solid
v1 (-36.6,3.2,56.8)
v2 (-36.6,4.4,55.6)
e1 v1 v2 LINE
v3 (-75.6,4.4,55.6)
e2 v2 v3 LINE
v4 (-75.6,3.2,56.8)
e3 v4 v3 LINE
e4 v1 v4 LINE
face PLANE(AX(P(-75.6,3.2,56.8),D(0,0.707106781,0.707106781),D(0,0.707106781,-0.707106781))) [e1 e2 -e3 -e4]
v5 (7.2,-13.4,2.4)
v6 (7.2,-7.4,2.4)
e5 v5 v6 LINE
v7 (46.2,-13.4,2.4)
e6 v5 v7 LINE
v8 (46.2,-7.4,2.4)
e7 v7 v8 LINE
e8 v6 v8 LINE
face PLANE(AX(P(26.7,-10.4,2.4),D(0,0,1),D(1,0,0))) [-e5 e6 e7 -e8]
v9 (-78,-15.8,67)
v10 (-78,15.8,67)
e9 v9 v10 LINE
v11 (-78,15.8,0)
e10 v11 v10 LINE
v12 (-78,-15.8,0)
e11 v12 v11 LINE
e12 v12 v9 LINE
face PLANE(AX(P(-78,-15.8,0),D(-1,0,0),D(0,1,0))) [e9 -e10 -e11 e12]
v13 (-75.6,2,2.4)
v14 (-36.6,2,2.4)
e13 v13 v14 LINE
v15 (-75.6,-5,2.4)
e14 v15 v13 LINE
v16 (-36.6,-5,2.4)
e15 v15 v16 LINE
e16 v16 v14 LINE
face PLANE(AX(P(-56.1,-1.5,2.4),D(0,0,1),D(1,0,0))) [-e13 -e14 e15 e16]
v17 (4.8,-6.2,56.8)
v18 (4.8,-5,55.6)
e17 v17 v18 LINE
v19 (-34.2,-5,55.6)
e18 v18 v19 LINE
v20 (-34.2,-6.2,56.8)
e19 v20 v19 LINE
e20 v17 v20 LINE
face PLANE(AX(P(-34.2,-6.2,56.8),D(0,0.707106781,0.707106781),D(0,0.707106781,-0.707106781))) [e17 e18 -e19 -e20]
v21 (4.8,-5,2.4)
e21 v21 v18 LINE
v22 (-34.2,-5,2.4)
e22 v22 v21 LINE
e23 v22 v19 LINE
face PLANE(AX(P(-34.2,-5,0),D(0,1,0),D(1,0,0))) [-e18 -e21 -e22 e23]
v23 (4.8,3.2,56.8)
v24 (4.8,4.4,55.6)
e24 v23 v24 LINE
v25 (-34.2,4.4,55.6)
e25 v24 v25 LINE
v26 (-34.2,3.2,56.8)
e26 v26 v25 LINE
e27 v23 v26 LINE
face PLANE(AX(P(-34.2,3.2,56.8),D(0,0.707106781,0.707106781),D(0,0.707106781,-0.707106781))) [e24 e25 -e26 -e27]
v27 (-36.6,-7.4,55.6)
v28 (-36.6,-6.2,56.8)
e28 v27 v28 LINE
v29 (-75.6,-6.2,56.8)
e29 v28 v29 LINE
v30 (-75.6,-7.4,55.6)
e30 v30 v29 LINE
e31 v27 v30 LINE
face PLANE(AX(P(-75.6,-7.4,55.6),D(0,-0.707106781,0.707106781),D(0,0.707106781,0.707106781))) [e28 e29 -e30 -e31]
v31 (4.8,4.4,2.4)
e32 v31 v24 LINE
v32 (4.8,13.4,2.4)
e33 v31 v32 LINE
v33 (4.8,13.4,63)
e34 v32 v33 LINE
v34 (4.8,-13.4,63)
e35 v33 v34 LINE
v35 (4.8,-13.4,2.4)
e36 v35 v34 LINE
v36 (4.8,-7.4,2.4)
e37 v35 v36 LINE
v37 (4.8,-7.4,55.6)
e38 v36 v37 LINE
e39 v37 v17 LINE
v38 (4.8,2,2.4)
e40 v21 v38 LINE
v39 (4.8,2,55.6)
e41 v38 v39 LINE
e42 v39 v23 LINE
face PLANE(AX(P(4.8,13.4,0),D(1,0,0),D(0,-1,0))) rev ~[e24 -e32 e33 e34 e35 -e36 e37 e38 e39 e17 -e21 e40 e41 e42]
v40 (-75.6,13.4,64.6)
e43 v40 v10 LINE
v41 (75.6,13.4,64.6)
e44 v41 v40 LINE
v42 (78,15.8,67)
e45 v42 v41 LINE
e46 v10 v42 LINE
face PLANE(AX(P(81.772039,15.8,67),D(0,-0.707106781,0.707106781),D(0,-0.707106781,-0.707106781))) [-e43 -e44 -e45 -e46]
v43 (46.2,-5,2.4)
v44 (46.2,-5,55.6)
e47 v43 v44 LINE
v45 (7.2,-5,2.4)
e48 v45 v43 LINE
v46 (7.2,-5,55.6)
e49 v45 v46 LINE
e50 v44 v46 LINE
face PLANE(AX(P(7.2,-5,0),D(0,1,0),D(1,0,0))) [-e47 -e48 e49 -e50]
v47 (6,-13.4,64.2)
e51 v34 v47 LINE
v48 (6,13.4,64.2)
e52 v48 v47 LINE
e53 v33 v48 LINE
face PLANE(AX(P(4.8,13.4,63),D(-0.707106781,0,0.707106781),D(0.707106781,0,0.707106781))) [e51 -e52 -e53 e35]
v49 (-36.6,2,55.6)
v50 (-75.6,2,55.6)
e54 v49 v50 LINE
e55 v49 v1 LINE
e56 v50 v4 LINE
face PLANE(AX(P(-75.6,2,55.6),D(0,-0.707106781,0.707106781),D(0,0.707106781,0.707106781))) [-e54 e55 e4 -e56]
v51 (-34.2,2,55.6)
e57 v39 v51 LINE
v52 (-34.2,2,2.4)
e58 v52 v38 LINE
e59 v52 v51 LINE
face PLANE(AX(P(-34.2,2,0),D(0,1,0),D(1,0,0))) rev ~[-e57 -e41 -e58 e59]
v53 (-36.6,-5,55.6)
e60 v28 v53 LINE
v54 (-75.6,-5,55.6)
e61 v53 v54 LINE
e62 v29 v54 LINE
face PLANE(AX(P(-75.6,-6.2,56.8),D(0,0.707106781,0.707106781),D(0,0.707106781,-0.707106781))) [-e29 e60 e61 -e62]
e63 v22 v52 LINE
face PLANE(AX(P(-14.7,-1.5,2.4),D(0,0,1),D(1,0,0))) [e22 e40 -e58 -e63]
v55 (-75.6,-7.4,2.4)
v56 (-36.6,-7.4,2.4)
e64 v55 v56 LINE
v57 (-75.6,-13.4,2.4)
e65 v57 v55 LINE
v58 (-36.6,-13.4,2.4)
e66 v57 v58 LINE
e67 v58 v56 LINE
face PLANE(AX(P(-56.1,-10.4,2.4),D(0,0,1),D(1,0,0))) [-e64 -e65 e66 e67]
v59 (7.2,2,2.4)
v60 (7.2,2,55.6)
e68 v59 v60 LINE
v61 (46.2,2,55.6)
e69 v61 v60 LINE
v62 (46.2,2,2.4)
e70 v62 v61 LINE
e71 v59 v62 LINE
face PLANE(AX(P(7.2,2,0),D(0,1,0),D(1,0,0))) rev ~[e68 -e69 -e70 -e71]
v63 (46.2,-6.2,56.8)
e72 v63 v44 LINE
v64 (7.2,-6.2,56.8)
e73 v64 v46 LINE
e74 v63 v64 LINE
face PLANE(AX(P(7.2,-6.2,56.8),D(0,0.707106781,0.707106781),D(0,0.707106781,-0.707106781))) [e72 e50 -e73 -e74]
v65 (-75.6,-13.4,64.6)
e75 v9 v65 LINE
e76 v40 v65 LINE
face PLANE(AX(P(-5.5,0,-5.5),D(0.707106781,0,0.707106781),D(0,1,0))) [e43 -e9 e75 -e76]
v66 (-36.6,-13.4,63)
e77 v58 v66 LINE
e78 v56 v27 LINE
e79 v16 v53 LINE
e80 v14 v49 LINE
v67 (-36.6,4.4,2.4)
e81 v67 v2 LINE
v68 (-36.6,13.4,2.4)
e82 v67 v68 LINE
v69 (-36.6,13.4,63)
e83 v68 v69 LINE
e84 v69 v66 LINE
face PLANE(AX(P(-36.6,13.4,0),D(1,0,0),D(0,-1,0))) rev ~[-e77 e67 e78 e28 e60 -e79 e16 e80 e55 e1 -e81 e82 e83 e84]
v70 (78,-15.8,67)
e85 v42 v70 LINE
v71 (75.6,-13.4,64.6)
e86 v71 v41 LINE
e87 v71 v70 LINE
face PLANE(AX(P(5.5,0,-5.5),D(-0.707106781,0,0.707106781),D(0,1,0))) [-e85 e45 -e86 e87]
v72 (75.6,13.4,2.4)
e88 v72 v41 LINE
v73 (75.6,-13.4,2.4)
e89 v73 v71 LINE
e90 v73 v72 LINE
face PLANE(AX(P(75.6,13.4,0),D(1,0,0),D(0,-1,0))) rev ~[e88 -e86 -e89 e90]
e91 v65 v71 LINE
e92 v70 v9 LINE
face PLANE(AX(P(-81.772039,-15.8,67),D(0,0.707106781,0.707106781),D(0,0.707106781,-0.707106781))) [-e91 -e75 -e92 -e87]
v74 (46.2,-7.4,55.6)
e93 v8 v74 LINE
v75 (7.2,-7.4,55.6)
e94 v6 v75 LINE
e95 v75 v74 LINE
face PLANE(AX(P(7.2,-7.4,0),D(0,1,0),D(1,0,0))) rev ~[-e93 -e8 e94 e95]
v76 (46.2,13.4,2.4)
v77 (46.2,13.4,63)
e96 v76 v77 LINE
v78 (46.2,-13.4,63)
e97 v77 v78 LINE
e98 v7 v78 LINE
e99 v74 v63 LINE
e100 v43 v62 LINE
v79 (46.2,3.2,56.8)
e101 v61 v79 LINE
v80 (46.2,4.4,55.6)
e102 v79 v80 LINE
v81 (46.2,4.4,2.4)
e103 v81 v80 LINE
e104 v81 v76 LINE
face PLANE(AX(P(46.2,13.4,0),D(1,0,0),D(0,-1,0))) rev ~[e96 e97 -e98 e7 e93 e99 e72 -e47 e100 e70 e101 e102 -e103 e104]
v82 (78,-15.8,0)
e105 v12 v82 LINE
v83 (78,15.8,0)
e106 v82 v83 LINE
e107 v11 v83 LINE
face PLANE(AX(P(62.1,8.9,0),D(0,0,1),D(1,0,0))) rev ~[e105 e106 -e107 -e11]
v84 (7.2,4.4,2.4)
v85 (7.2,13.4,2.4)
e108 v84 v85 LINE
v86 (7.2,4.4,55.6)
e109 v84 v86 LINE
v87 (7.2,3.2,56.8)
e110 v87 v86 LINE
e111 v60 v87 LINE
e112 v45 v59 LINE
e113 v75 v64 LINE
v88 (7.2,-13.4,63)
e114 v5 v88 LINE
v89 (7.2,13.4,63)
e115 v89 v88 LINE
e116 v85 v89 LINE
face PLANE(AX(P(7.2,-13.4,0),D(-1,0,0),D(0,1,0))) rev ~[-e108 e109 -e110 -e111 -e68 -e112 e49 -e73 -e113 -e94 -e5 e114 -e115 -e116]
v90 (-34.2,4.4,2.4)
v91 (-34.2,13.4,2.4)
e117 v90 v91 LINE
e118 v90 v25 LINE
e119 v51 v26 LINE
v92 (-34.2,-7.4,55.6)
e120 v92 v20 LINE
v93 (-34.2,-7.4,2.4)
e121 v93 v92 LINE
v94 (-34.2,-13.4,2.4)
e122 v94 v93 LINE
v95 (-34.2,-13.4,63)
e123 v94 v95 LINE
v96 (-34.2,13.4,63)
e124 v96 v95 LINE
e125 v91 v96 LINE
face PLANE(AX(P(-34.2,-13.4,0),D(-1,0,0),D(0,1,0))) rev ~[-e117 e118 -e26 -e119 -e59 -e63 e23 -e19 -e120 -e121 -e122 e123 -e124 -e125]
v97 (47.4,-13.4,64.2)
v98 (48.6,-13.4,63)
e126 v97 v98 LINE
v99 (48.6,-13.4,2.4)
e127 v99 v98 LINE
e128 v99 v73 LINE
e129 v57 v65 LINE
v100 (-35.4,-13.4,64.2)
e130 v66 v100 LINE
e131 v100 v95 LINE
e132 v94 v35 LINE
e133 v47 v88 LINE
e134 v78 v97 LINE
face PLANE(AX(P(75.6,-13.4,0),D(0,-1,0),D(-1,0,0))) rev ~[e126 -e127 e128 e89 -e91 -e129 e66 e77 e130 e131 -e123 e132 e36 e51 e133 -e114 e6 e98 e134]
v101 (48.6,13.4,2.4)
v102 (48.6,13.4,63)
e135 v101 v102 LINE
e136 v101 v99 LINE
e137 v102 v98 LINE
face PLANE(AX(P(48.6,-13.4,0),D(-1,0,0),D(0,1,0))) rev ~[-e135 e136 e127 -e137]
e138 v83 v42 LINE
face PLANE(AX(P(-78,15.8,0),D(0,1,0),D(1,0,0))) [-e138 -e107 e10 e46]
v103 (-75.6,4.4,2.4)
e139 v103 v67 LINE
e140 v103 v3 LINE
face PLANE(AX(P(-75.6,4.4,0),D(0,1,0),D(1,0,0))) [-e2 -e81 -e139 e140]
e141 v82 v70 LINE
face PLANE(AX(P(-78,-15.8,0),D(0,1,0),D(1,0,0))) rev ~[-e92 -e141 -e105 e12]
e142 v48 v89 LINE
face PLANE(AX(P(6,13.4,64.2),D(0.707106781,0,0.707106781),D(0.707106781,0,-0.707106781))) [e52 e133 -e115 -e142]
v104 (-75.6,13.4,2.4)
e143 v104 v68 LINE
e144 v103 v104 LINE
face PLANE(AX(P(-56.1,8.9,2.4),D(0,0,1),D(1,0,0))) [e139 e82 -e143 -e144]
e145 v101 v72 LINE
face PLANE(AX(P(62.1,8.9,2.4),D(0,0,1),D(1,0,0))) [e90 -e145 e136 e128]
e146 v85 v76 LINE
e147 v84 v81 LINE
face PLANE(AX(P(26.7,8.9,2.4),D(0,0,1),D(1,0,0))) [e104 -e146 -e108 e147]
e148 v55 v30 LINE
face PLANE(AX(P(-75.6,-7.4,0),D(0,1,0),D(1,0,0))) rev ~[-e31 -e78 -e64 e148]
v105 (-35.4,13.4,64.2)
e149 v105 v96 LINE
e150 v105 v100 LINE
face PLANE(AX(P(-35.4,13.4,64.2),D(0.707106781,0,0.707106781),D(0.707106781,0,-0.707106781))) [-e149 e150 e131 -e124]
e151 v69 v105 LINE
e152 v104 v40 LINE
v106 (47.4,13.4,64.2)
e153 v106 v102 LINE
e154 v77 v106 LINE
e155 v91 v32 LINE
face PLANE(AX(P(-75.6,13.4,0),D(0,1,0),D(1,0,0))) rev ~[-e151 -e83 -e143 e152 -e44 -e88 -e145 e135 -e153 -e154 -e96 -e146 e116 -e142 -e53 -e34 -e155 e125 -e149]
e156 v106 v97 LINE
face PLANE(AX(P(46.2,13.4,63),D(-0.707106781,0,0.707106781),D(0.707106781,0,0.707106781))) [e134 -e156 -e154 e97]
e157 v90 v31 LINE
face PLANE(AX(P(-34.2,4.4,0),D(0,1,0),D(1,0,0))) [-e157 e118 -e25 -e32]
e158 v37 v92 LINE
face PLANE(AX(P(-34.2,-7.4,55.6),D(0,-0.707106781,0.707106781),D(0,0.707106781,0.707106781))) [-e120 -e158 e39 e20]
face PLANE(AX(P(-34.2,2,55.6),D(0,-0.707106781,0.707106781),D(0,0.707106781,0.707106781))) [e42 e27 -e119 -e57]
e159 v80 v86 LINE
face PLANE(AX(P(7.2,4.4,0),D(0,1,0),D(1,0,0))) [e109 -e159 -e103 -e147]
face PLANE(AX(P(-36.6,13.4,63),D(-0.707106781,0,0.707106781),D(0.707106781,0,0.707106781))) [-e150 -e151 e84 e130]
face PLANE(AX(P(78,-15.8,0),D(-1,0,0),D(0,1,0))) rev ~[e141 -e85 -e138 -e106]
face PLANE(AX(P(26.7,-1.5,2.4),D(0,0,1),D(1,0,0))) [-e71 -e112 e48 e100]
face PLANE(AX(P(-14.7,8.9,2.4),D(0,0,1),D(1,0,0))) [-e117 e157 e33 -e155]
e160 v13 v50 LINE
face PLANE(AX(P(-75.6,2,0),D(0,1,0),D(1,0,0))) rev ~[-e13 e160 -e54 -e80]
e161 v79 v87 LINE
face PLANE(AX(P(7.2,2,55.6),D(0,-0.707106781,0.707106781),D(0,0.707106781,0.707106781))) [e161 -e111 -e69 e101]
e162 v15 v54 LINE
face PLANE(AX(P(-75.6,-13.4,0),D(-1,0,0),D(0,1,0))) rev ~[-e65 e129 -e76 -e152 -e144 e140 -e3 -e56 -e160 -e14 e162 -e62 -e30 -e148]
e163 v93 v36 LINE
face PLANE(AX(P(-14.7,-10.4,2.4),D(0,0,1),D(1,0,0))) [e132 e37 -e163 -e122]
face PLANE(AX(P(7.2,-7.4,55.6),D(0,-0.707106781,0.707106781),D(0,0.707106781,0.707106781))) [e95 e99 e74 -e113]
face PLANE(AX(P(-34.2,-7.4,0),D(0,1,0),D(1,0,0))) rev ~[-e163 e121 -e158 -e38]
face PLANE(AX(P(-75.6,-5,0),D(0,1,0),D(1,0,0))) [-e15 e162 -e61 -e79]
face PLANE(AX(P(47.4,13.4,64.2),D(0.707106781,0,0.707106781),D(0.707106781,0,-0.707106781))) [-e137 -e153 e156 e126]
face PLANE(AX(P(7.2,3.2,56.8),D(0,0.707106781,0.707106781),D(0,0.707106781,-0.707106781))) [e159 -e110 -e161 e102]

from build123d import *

# Parameters (mm, degrees)
F0_W          = 156
F0_H          = 31.6
F1_DEPTH      = 67
F0_W_2        = 2.4
F0_H_2        = 6
F0_H_3        = 2.4
F0_H_4        = 7
F0_H_5        = 9
F2_DEPTH      = 65.4
F0_W_3        = 39
F3_DEPTH      = 58
F4_DEPTH      = 2.4
F0_W_4        = 27
F5_DEPTH      = 2.4
F6_T1_DEPTH   = 39
F6_T3_DEPTH   = 39
F6_T5_DEPTH   = 39
F6_T7_DEPTH   = 26.8
F6_T12_DEPTH  = 51.3440783422
F6_T17_DEPTH  = 51.3440783422
F6_T22_DEPTH  = 51.3440783422
F6_T27_DEPTH  = 51.3440783422
F6_T32_DEPTH  = 51.3440783422
F6_T37_DEPTH  = 51.3440783422
F6_T42_DEPTH  = 51.3440783422
F6_T47_DEPTH  = 51.3440783422
F6_T52_DEPTH  = 51.3440783422
F6_T57_DEPTH  = 51.3440783422
F6_T62_DEPTH  = 51.3440783422
F6_T67_DEPTH  = 51.3440783422
F6_T72_DEPTH  = 51.3440783422
F6_T77_DEPTH  = 51.3440783422
F6_T82_DEPTH  = 51.3440783422
F6_T87_DEPTH  = 51.3440783422
F6_T92_DEPTH  = 163.5440783422
F6_T98_DEPTH  = 163.5440783422
F6_T104_DEPTH = 39.1440783422
F6_T110_DEPTH = 39.1440783422


# Not quite as in the source:
# - a fillet or chamfer that OpenCascade refuses, or shapes differently, is made with other operations: its cross-section is extruded or revolved along the edge and cut away or added


with BuildPart() as f1:
    # F0 (on Top) → F1 (new body)
    with BuildSketch(Plane.XY):
        Rectangle(F0_W, F0_H)
        Polygon((48.6, 13.4), (75.6, 13.4), (75.6, 4.4), (75.6, 2), (75.6, -5), (75.6, -7.4), (75.6, -13.4), (48.6, -13.4), (46.2, -13.4), (7.2, -13.4), (4.8, -13.4), (-34.2, -13.4), (-36.6, -13.4), (-75.6, -13.4), (-75.6, -7.4), (-75.6, -5), (-75.6, 2), (-75.6, 4.4), (-75.6, 13.4), (-36.6, 13.4), (-34.2, 13.4), (4.8, 13.4), (7.2, 13.4), (46.2, 13.4), align=None, mode=Mode.SUBTRACT)
    extrude(amount=F1_DEPTH)

    # F0 (on Top) → F2 (join)
    with BuildSketch(Plane.XY):
        with Locations((47.4, -10.4)):
            Rectangle(F0_W_2, F0_H_2)
        with Locations((47.4, -6.2)):
            Rectangle(F0_W_2, F0_H_3)
        with Locations((47.4, -1.5)):
            Rectangle(F0_W_2, F0_H_4)
        with Locations((47.4, 3.2)):
            Rectangle(F0_W_2, F0_H_3)
        with Locations((47.4, 8.9)):
            Rectangle(F0_W_2, F0_H_5)
        with Locations((6, 8.9)):
            Rectangle(F0_W_2, F0_H_5)
        with Locations((6, 3.2)):
            Rectangle(F0_W_2, F0_H_3)
        with Locations((6, -1.5)):
            Rectangle(F0_W_2, F0_H_4)
        with Locations((6, -6.2)):
            Rectangle(F0_W_2, F0_H_3)
        with Locations((6, -10.4)):
            Rectangle(F0_W_2, F0_H_2)
        with Locations((-35.4, -10.4)):
            Rectangle(F0_W_2, F0_H_2)
        with Locations((-35.4, -6.2)):
            Rectangle(F0_W_2, F0_H_3)
        with Locations((-35.4, -1.5)):
            Rectangle(F0_W_2, F0_H_4)
        with Locations((-35.4, 3.2)):
            Rectangle(F0_W_2, F0_H_3)
        with Locations((-35.4, 8.9)):
            Rectangle(F0_W_2, F0_H_5)
    extrude(amount=F2_DEPTH)

    # F0 (on Top) → F3 (join)
    with BuildSketch(Plane.XY):
        with Locations((-56.1, -6.2)):
            Rectangle(F0_W_3, F0_H_3)
        with Locations((-56.1, 3.2)):
            Rectangle(F0_W_3, F0_H_3)
        with Locations((-14.7, -6.2)):
            Rectangle(F0_W_3, F0_H_3)
        with Locations((-14.7, 3.2)):
            Rectangle(F0_W_3, F0_H_3)
        with Locations((26.7, 3.2)):
            Rectangle(F0_W_3, F0_H_3)
        with Locations((26.7, -6.2)):
            Rectangle(F0_W_3, F0_H_3)
    extrude(amount=F3_DEPTH)

    # F0 (on Top) → F4 (join)
    with BuildSketch(Plane.XY):
        with Locations((-56.1, -10.4)):
            Rectangle(F0_W_3, F0_H_2)
        with Locations((-56.1, -1.5)):
            Rectangle(F0_W_3, F0_H_4)
        with Locations((-56.1, 8.9)):
            Rectangle(F0_W_3, F0_H_5)
        with Locations((-14.7, 8.9)):
            Rectangle(F0_W_3, F0_H_5)
        with Locations((-14.7, -1.5)):
            Rectangle(F0_W_3, F0_H_4)
        with Locations((-14.7, -10.4)):
            Rectangle(F0_W_3, F0_H_2)
        with Locations((26.7, -10.4)):
            Rectangle(F0_W_3, F0_H_2)
        with Locations((26.7, -1.5)):
            Rectangle(F0_W_3, F0_H_4)
        with Locations((26.7, 8.9)):
            Rectangle(F0_W_3, F0_H_5)
    extrude(amount=F4_DEPTH)

    # F0 (on Top) → F5 (join)
    with BuildSketch(Plane.XY):
        with Locations((62.1, 8.9)):
            Rectangle(F0_W_4, F0_H_5)
        with Locations((62.1, 3.2)):
            Rectangle(F0_W_4, F0_H_3)
        with Locations((62.1, -1.5)):
            Rectangle(F0_W_4, F0_H_4)
        with Locations((62.1, -6.2)):
            Rectangle(F0_W_4, F0_H_3)
        with Locations((62.1, -10.4)):
            Rectangle(F0_W_4, F0_H_2)
    extrude(amount=F5_DEPTH)

    # F6: chamfer of 2.4 on 22 edges, made by hand

    # F6_s2 → F6_t1 (cut)
    with BuildSketch(Plane.YZ.offset(-75.6)):
        Polygon((2, 55.6), (4.4, 58), (2, 58), align=None)
        Polygon((2, 58), (4.4, 55.6), (4.4, 58), align=None)
        Polygon((-7.4, 58), (-5, 55.6), (-5, 58), align=None)
        Polygon((-7.4, 55.6), (-5, 58), (-7.4, 58), align=None)
    extrude(amount=F6_T1_DEPTH, mode=Mode.SUBTRACT)

    # F6_s4 → F6_t3 (cut)
    with BuildSketch(Plane.YZ.offset(-34.2)):
        Polygon((-7.4, 55.6), (-5, 58), (-7.4, 58), align=None)
        Polygon((-7.4, 58), (-5, 55.6), (-5, 58), align=None)
        Polygon((2, 58), (4.4, 55.6), (4.4, 58), align=None)
        Polygon((2, 55.6), (4.4, 58), (2, 58), align=None)
    extrude(amount=F6_T3_DEPTH, mode=Mode.SUBTRACT)

    # F6_s6 → F6_t5 (cut)
    with BuildSketch(Plane.YZ.offset(7.2)):
        Polygon((2, 55.6), (4.4, 58), (2, 58), align=None)
        Polygon((2, 58), (4.4, 55.6), (4.4, 58), align=None)
        Polygon((-7.4, 55.6), (-5, 58), (-7.4, 58), align=None)
        Polygon((-7.4, 58), (-5, 55.6), (-5, 58), align=None)
    extrude(amount=F6_T5_DEPTH, mode=Mode.SUBTRACT)

    # F6_s8 → F6_t7 (cut)
    with BuildSketch(Plane.XZ.offset(-13.4)):
        Polygon((-36.6, 63), (-34.2, 65.4), (-36.6, 65.4), align=None)
        Polygon((-36.6, 65.4), (-34.2, 63), (-34.2, 65.4), align=None)
        Polygon((4.8, 63), (7.2, 65.4), (4.8, 65.4), align=None)
        Polygon((4.8, 65.4), (7.2, 63), (7.2, 65.4), align=None)
        Polygon((46.2, 63), (48.6, 65.4), (46.2, 65.4), align=None)
        Polygon((46.2, 65.4), (48.6, 63), (48.6, 65.4), align=None)
    extrude(amount=F6_T7_DEPTH, mode=Mode.SUBTRACT)


with BuildPart() as f6_tool10:
    # F6_s11 → F6_t12 (new body)
    with BuildSketch(Plane.YZ.offset(-81.7720391711)):
        Polygon((2, 55.6), (4.4, 58), (2, 58), align=None)
    extrude(amount=F6_T12_DEPTH)

    split(bisect_by=Plane.YZ.offset(-34.2), keep=Keep.TOP)


with BuildPart() as f1_1:
    add(f1.part)

    # F6_t9: cut F6_tool10
    add(f6_tool10.part, mode=Mode.SUBTRACT)


with BuildPart() as f6_tool15:
    # F6_s16 → F6_t17 (new body)
    with BuildSketch(Plane.YZ.offset(-30.4279608289)):
        Polygon((2, 58), (4.4, 55.6), (4.4, 58), align=None)
    extrude(amount=-F6_T17_DEPTH)

    split(bisect_by=Plane.YZ.offset(-34.2), keep=Keep.TOP)


with BuildPart() as f1_2:
    add(f1_1.part)

    # F6_t14: cut F6_tool15
    add(f6_tool15.part, mode=Mode.SUBTRACT)


with BuildPart() as f6_tool20:
    # F6_s21 → F6_t22 (new body)
    with BuildSketch(Plane.YZ.offset(-30.4279608289)):
        Polygon((-7.4, 58), (-5, 55.6), (-5, 58), align=None)
    extrude(amount=-F6_T22_DEPTH)

    split(bisect_by=Plane.YZ.offset(-34.2), keep=Keep.TOP)


with BuildPart() as f1_3:
    add(f1_2.part)

    # F6_t19: cut F6_tool20
    add(f6_tool20.part, mode=Mode.SUBTRACT)


with BuildPart() as f6_tool25:
    # F6_s26 → F6_t27 (new body)
    with BuildSketch(Plane.YZ.offset(-81.7720391711)):
        Polygon((-7.4, 55.6), (-5, 58), (-7.4, 58), align=None)
    extrude(amount=F6_T27_DEPTH)

    split(bisect_by=Plane.YZ.offset(-34.2), keep=Keep.TOP)


with BuildPart() as f1_4:
    add(f1_3.part)

    # F6_t24: cut F6_tool25
    add(f6_tool25.part, mode=Mode.SUBTRACT)


with BuildPart() as f6_tool30:
    # F6_s31 → F6_t32 (new body)
    with BuildSketch(Plane.YZ.offset(-40.3720391711)):
        Polygon((-7.4, 55.6), (-5, 58), (-7.4, 58), align=None)
    extrude(amount=F6_T32_DEPTH)

    split(bisect_by=Plane.YZ.offset(-36.6), keep=Keep.BOTTOM)


with BuildPart() as f1_5:
    add(f1_4.part)

    # F6_t29: cut F6_tool30
    add(f6_tool30.part, mode=Mode.SUBTRACT)


with BuildPart() as f6_tool35:
    # F6_s36 → F6_t37 (new body)
    with BuildSketch(Plane.YZ.offset(-40.3720391711)):
        Polygon((-7.4, 55.6), (-5, 58), (-7.4, 58), align=None)
    extrude(amount=F6_T37_DEPTH)

    split(bisect_by=Plane.YZ.offset(7.2), keep=Keep.TOP)


with BuildPart() as f1_6:
    add(f1_5.part)

    # F6_t34: cut F6_tool35
    add(f6_tool35.part, mode=Mode.SUBTRACT)


with BuildPart() as f6_tool40:
    # F6_s41 → F6_t42 (new body)
    with BuildSketch(Plane.YZ.offset(10.9720391711)):
        Polygon((-7.4, 58), (-5, 55.6), (-5, 58), align=None)
    extrude(amount=-F6_T42_DEPTH)

    split(bisect_by=Plane.YZ.offset(7.2), keep=Keep.TOP)


with BuildPart() as f1_7:
    add(f1_6.part)

    # F6_t39: cut F6_tool40
    add(f6_tool40.part, mode=Mode.SUBTRACT)


with BuildPart() as f6_tool45:
    # F6_s46 → F6_t47 (new body)
    with BuildSketch(Plane.YZ.offset(10.9720391711)):
        Polygon((-7.4, 58), (-5, 55.6), (-5, 58), align=None)
    extrude(amount=-F6_T47_DEPTH)

    split(bisect_by=Plane.YZ.offset(-36.6), keep=Keep.BOTTOM)


with BuildPart() as f1_8:
    add(f1_7.part)

    # F6_t44: cut F6_tool45
    add(f6_tool45.part, mode=Mode.SUBTRACT)


with BuildPart() as f6_tool50:
    # F6_s51 → F6_t52 (new body)
    with BuildSketch(Plane.YZ.offset(10.9720391711)):
        Polygon((2, 58), (4.4, 55.6), (4.4, 58), align=None)
    extrude(amount=-F6_T52_DEPTH)

    split(bisect_by=Plane.YZ.offset(7.2), keep=Keep.TOP)


with BuildPart() as f1_9:
    add(f1_8.part)

    # F6_t49: cut F6_tool50
    add(f6_tool50.part, mode=Mode.SUBTRACT)


with BuildPart() as f6_tool55:
    # F6_s56 → F6_t57 (new body)
    with BuildSketch(Plane.YZ.offset(10.9720391711)):
        Polygon((2, 58), (4.4, 55.6), (4.4, 58), align=None)
    extrude(amount=-F6_T57_DEPTH)

    split(bisect_by=Plane.YZ.offset(-36.6), keep=Keep.BOTTOM)


with BuildPart() as f1_10:
    add(f1_9.part)

    # F6_t54: cut F6_tool55
    add(f6_tool55.part, mode=Mode.SUBTRACT)


with BuildPart() as f6_tool60:
    # F6_s61 → F6_t62 (new body)
    with BuildSketch(Plane.YZ.offset(-40.3720391711)):
        Polygon((2, 55.6), (4.4, 58), (2, 58), align=None)
    extrude(amount=F6_T62_DEPTH)

    split(bisect_by=Plane.YZ.offset(-36.6), keep=Keep.BOTTOM)


with BuildPart() as f1_11:
    add(f1_10.part)

    # F6_t59: cut F6_tool60
    add(f6_tool60.part, mode=Mode.SUBTRACT)


with BuildPart() as f6_tool65:
    # F6_s66 → F6_t67 (new body)
    with BuildSketch(Plane.YZ.offset(-40.3720391711)):
        Polygon((2, 55.6), (4.4, 58), (2, 58), align=None)
    extrude(amount=F6_T67_DEPTH)

    split(bisect_by=Plane.YZ.offset(7.2), keep=Keep.TOP)


with BuildPart() as f1_12:
    add(f1_11.part)

    # F6_t64: cut F6_tool65
    add(f6_tool65.part, mode=Mode.SUBTRACT)


with BuildPart() as f6_tool70:
    # F6_s71 → F6_t72 (new body)
    with BuildSketch(Plane.YZ.offset(1.0279608289)):
        Polygon((2, 55.6), (4.4, 58), (2, 58), align=None)
    extrude(amount=F6_T72_DEPTH)

    split(bisect_by=Plane.YZ.offset(4.8), keep=Keep.BOTTOM)


with BuildPart() as f1_13:
    add(f1_12.part)

    # F6_t69: cut F6_tool70
    add(f6_tool70.part, mode=Mode.SUBTRACT)


with BuildPart() as f6_tool75:
    # F6_s76 → F6_t77 (new body)
    with BuildSketch(Plane.YZ.offset(52.3720391711)):
        Polygon((2, 58), (4.4, 55.6), (4.4, 58), align=None)
    extrude(amount=-F6_T77_DEPTH)

    split(bisect_by=Plane.YZ.offset(4.8), keep=Keep.BOTTOM)


with BuildPart() as f1_14:
    add(f1_13.part)

    # F6_t74: cut F6_tool75
    add(f6_tool75.part, mode=Mode.SUBTRACT)


with BuildPart() as f6_tool80:
    # F6_s81 → F6_t82 (new body)
    with BuildSketch(Plane.YZ.offset(1.0279608289)):
        Polygon((-7.4, 55.6), (-5, 58), (-7.4, 58), align=None)
    extrude(amount=F6_T82_DEPTH)

    split(bisect_by=Plane.YZ.offset(4.8), keep=Keep.BOTTOM)


with BuildPart() as f1_15:
    add(f1_14.part)

    # F6_t79: cut F6_tool80
    add(f6_tool80.part, mode=Mode.SUBTRACT)


with BuildPart() as f6_tool85:
    # F6_s86 → F6_t87 (new body)
    with BuildSketch(Plane.YZ.offset(52.3720391711)):
        Polygon((-7.4, 58), (-5, 55.6), (-5, 58), align=None)
    extrude(amount=-F6_T87_DEPTH)

    split(bisect_by=Plane.YZ.offset(4.8), keep=Keep.BOTTOM)


with BuildPart() as f1_16:
    add(f1_15.part)

    # F6_t84: cut F6_tool85
    add(f6_tool85.part, mode=Mode.SUBTRACT)


with BuildPart() as f6_tool90:
    # F6_s91 → F6_t92 (new body)
    with BuildSketch(Plane.YZ.offset(81.7720391711)):
        Polygon((15.8, 67), (13.4, 64.6), (13.4, 67), align=None)
    extrude(amount=-F6_T92_DEPTH)

    split(bisect_by=Plane(origin=(5.5, 0, -5.5), x_dir=(0, 1, 0), z_dir=(-0.7071067812, 0, 0.7071067812)), keep=Keep.TOP)

    split(bisect_by=Plane(origin=(-5.5, 0, -5.5), x_dir=(0, 1, 0), z_dir=(0.7071067812, 0, 0.7071067812)), keep=Keep.TOP)


with BuildPart() as f1_17:
    add(f1_16.part)

    # F6_t89: cut F6_tool90
    add(f6_tool90.part, mode=Mode.SUBTRACT)


with BuildPart() as f6_tool96:
    # F6_s97 → F6_t98 (new body)
    with BuildSketch(Plane.YZ.offset(-81.7720391711)):
        Polygon((-15.8, 67), (-13.4, 64.6), (-13.4, 67), align=None)
    extrude(amount=F6_T98_DEPTH)

    split(bisect_by=Plane(origin=(5.5, 0, -5.5), x_dir=(0, 1, 0), z_dir=(-0.7071067812, 0, 0.7071067812)), keep=Keep.TOP)

    split(bisect_by=Plane(origin=(-5.5, 0, -5.5), x_dir=(0, 1, 0), z_dir=(0.7071067812, 0, 0.7071067812)), keep=Keep.TOP)


with BuildPart() as f1_18:
    add(f1_17.part)

    # F6_t95: cut F6_tool96
    add(f6_tool96.part, mode=Mode.SUBTRACT)


with BuildPart() as f6_tool102:
    # F6_s103 → F6_t104 (new body)
    with BuildSketch(Plane.XZ.offset(-19.5720391711)):
        Polygon((-78, 67), (-75.6, 64.6), (-75.6, 67), align=None)
    extrude(amount=F6_T104_DEPTH)

    split(bisect_by=Plane(origin=(0, -25.6, 25.6), x_dir=(1, 0, 0), z_dir=(0, -0.7071067812, 0.7071067812)), keep=Keep.TOP)

    split(bisect_by=Plane(origin=(0, 25.6, 25.6), x_dir=(1, 0, 0), z_dir=(0, 0.7071067812, 0.7071067812)), keep=Keep.TOP)


with BuildPart() as f1_19:
    add(f1_18.part)

    # F6_t101: cut F6_tool102
    add(f6_tool102.part, mode=Mode.SUBTRACT)


with BuildPart() as f6_tool108:
    # F6_s109 → F6_t110 (new body)
    with BuildSketch(Plane.XZ.offset(19.5720391711)):
        Polygon((78, 67), (75.6, 64.6), (75.6, 67), align=None)
    extrude(amount=-F6_T110_DEPTH)

    split(bisect_by=Plane(origin=(0, -25.6, 25.6), x_dir=(1, 0, 0), z_dir=(0, -0.7071067812, 0.7071067812)), keep=Keep.TOP)

    split(bisect_by=Plane(origin=(0, 25.6, 25.6), x_dir=(1, 0, 0), z_dir=(0, 0.7071067812, 0.7071067812)), keep=Keep.TOP)


with BuildPart() as f1_20:
    add(f1_19.part)

    # F6_t107: cut F6_tool108
    add(f6_tool108.part, mode=Mode.SUBTRACT)


solid = f1_20.part
